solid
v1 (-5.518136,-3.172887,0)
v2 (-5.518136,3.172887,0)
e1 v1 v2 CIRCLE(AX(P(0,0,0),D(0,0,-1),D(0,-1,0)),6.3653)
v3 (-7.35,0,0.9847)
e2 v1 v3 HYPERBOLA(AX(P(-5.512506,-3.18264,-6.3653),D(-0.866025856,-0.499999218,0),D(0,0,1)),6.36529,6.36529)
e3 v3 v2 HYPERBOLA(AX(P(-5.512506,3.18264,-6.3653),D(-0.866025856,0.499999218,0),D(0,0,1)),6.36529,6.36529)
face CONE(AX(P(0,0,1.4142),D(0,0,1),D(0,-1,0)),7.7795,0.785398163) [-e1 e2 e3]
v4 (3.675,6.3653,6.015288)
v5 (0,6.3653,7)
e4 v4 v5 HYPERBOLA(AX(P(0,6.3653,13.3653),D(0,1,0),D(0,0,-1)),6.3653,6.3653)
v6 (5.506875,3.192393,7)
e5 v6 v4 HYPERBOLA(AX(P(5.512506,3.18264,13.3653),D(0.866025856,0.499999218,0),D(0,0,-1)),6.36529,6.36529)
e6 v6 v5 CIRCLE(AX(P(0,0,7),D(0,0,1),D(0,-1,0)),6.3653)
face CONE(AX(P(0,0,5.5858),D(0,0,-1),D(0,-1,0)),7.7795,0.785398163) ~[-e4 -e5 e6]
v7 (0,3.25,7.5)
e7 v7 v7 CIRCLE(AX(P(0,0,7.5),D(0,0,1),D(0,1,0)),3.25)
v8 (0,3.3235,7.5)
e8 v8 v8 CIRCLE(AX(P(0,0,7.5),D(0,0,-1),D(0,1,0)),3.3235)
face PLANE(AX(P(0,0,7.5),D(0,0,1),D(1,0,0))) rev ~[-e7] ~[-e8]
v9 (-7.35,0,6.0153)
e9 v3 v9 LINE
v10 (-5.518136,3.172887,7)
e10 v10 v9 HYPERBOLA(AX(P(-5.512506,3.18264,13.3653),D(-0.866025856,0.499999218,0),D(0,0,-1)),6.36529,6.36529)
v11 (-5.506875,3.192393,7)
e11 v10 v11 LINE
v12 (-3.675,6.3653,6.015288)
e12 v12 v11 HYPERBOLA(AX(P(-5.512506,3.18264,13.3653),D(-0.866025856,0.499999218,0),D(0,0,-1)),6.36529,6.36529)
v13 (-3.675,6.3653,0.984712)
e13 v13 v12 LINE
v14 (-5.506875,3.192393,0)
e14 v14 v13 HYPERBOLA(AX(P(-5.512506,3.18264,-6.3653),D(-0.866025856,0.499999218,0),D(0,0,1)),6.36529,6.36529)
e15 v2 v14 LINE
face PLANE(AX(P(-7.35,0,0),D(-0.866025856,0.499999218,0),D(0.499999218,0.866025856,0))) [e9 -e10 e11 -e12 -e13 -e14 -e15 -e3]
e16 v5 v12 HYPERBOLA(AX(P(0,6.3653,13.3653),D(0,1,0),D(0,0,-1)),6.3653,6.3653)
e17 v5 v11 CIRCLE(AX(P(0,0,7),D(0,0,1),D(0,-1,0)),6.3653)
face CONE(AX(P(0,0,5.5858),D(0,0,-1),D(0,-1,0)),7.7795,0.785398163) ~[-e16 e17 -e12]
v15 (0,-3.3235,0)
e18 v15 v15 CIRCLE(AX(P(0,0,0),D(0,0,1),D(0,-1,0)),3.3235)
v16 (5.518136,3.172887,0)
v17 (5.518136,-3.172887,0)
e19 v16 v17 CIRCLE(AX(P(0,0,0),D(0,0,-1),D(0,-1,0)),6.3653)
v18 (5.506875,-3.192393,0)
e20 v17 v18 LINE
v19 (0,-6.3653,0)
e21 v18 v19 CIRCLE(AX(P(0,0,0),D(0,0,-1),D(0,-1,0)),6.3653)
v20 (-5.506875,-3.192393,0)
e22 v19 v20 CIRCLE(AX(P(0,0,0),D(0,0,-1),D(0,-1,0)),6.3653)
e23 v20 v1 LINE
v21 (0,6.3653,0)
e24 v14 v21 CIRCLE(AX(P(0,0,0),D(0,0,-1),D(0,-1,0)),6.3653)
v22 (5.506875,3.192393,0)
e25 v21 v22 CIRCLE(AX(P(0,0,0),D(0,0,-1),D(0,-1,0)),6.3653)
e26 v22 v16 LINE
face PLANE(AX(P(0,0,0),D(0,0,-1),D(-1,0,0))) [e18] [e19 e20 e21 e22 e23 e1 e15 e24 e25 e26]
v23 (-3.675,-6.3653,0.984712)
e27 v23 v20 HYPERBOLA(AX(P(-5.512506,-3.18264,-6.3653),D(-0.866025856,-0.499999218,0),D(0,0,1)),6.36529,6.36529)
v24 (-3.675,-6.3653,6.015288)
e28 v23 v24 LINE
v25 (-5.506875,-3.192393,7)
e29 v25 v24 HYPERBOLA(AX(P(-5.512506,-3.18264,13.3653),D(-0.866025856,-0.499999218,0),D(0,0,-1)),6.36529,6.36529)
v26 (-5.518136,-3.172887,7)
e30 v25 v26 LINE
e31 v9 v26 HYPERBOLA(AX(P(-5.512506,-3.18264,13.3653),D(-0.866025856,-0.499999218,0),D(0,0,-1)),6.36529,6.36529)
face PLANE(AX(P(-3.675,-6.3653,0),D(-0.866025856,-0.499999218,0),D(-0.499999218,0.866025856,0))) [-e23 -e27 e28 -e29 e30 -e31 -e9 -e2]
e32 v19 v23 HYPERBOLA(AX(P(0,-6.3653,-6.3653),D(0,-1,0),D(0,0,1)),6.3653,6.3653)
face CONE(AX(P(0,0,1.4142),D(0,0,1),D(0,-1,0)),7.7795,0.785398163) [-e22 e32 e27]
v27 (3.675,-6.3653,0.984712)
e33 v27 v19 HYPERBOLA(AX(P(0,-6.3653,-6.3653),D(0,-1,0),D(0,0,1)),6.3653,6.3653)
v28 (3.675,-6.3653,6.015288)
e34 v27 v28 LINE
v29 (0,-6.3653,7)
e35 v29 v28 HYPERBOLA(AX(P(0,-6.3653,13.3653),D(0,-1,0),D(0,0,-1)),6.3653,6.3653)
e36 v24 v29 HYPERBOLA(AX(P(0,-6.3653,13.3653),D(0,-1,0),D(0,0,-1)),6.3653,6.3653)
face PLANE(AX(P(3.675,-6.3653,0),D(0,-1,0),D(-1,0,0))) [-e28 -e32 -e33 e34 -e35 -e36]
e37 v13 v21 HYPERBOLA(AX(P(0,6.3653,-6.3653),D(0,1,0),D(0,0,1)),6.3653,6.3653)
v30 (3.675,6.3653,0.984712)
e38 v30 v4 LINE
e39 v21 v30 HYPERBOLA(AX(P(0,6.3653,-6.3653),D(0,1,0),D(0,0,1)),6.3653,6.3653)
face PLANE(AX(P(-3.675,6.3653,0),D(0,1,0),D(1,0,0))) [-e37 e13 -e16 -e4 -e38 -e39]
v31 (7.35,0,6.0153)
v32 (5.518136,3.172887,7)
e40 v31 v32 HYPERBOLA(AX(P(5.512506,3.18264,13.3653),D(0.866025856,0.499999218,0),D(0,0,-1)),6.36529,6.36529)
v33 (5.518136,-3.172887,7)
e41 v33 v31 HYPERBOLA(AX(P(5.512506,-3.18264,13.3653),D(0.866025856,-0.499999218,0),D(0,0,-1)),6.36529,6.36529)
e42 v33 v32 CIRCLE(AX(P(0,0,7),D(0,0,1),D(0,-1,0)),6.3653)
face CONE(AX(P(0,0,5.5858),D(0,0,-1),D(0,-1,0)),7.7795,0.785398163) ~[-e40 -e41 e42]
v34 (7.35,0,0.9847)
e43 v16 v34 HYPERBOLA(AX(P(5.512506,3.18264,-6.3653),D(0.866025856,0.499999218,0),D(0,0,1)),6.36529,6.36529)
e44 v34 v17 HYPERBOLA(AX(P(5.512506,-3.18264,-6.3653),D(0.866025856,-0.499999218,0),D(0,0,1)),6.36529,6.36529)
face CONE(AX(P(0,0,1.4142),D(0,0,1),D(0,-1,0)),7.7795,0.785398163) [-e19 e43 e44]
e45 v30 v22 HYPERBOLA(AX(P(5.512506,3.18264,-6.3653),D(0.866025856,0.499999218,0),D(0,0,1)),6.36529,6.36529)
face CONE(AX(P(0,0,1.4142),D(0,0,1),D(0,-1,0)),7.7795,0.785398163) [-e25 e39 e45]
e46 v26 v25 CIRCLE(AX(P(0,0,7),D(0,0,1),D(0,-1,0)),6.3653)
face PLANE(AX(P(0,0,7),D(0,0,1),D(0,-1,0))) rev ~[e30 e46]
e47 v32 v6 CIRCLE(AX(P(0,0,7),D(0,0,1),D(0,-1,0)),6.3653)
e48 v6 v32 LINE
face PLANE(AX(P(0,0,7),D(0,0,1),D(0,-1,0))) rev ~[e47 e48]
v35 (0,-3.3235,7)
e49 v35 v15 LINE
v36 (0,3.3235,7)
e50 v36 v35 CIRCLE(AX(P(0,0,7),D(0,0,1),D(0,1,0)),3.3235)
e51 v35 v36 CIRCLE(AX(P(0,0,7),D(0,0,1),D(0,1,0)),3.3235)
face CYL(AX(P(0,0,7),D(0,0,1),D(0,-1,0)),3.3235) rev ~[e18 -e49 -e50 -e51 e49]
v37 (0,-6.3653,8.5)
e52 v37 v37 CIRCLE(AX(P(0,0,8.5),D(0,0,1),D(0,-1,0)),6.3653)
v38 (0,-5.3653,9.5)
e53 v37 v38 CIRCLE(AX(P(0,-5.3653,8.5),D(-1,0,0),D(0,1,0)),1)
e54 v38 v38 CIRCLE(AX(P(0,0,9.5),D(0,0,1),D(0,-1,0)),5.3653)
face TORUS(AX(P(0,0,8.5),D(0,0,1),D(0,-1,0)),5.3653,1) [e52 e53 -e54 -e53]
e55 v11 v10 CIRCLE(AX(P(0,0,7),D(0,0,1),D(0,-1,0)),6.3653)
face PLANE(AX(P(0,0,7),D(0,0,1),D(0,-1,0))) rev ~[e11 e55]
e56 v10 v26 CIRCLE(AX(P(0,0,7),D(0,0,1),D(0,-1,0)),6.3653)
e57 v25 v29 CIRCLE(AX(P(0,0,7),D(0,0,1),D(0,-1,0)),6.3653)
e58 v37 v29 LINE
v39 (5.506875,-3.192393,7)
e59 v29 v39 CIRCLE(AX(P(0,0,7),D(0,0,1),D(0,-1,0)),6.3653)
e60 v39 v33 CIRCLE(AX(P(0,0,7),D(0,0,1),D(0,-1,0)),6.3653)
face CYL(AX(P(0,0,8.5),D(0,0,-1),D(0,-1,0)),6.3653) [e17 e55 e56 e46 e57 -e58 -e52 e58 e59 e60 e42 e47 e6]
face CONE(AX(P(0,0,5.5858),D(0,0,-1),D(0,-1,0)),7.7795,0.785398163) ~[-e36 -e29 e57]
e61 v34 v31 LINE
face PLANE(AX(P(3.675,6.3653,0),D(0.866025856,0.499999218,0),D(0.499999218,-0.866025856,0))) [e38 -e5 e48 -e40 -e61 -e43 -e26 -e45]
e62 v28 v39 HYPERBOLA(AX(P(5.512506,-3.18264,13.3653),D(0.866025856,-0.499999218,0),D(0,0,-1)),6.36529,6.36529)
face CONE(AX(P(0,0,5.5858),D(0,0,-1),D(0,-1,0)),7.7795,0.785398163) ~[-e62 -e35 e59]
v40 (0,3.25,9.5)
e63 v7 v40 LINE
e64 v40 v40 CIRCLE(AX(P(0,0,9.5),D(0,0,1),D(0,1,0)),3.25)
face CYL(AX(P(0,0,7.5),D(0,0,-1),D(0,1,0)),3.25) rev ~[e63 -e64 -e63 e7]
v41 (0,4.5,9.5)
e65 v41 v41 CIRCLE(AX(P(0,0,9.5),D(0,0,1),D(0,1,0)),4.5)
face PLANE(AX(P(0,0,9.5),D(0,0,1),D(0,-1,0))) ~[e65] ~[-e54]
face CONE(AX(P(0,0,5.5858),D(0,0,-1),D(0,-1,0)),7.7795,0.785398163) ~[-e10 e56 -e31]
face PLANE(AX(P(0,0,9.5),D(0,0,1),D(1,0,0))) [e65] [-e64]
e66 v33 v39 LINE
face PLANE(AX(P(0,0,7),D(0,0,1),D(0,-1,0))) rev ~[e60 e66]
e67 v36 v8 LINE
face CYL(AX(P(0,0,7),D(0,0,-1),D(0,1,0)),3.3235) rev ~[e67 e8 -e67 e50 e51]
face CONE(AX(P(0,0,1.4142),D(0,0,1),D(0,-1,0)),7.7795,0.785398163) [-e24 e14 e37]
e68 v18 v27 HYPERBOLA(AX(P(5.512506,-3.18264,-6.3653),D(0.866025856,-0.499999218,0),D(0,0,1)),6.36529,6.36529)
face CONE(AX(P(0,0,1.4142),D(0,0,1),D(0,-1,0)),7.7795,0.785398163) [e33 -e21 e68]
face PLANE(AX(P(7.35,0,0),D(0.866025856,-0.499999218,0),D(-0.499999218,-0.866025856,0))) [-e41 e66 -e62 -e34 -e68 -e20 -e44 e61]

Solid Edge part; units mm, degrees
sketch "Sketch1" plane through (0, 0, 0) normal (0, 0, 1) x (1, 0, 0)
  line L0 (-3.675, 6.3653) -> (3.675, 6.3653)
  line L1 (3.675, 6.3653) -> (7.35, 0)
  line L2 (7.35, 0) -> (3.675, -6.3653)
  line L3 (3.675, -6.3653) -> (-3.675, -6.3653)
  line L4 (-3.675, -6.3653) -> (-7.35, 0)
  line L5 (-7.35, 0) -> (-3.675, 6.3653)
extrude "Protrusion1" add sketch "Sketch1" along normal blind 7
sketch "Sketch2" plane through (0, -5.5125, 6.3) normal (-1, 0, 0) x (0, 1, 0)
  line L0 (-2.267, 4.8858) -> (0.5614, 7.7142)
  line L1 (-2.267, 4.8858) -> (-2.267, 0.7142)
  line L2 (-2.267, 0.7142) -> (0.5614, -2.1142)
revolve "RevolvedCutout1" cut sketch "Sketch2" angle 360 about axis through (0, 0, 0.5943) along (0, 0, -1) material side at (0, -6.4007, -0.0354)
sketch "Sketch3" plane through (0, 0, 0) normal (1, 0, 0) x (0, 1, 0)
  line L0 (0, 9.5) -> (-5.3653, 9.5)
  arc A0 (-6.3653, 8.5) -> (-5.3653, 9.5) centre (-5.3653, 8.5) cw
  line L1 (-6.3653, 8.5) -> (-6.3653, 7)
  line L2 (-6.3653, 7) -> (0, 7)
  line L3 (0, 7) -> (0, 9.5)
  dimension "D1" = 9.5
revolve "RevolvedProtrusion1" add sketch "Sketch3" angle 360 about axis through (0, 0, -57) along (0, 0, 1)
hole "Hole_1" at (0, 0, 7) direction (0, 0, 1) diameter 6.647 end up to next both ways yes
sketch "Sketch4" plane through (0, 0, 9.5) normal (0, 0, 1) x (0, 1, 0)
  circle A0 centre (0, 0) radius 4.5
extrude "ExtrudedCutout_2" cut sketch "Sketch4" against normal blind 2
sketch "Sketch5" plane through (0, 0, 7.5) normal (0, 0, 1) x (0, 1, 0)
  circle A0 centre (0, 0) radius 4.5
  circle A1 centre (0, 0) radius 3.25
  dimension "D1" = 6.5
extrude "Protrusion2" add sketch "Sketch5" along normal up to vertex (2 mm away)
properties material "Stainless steel"
